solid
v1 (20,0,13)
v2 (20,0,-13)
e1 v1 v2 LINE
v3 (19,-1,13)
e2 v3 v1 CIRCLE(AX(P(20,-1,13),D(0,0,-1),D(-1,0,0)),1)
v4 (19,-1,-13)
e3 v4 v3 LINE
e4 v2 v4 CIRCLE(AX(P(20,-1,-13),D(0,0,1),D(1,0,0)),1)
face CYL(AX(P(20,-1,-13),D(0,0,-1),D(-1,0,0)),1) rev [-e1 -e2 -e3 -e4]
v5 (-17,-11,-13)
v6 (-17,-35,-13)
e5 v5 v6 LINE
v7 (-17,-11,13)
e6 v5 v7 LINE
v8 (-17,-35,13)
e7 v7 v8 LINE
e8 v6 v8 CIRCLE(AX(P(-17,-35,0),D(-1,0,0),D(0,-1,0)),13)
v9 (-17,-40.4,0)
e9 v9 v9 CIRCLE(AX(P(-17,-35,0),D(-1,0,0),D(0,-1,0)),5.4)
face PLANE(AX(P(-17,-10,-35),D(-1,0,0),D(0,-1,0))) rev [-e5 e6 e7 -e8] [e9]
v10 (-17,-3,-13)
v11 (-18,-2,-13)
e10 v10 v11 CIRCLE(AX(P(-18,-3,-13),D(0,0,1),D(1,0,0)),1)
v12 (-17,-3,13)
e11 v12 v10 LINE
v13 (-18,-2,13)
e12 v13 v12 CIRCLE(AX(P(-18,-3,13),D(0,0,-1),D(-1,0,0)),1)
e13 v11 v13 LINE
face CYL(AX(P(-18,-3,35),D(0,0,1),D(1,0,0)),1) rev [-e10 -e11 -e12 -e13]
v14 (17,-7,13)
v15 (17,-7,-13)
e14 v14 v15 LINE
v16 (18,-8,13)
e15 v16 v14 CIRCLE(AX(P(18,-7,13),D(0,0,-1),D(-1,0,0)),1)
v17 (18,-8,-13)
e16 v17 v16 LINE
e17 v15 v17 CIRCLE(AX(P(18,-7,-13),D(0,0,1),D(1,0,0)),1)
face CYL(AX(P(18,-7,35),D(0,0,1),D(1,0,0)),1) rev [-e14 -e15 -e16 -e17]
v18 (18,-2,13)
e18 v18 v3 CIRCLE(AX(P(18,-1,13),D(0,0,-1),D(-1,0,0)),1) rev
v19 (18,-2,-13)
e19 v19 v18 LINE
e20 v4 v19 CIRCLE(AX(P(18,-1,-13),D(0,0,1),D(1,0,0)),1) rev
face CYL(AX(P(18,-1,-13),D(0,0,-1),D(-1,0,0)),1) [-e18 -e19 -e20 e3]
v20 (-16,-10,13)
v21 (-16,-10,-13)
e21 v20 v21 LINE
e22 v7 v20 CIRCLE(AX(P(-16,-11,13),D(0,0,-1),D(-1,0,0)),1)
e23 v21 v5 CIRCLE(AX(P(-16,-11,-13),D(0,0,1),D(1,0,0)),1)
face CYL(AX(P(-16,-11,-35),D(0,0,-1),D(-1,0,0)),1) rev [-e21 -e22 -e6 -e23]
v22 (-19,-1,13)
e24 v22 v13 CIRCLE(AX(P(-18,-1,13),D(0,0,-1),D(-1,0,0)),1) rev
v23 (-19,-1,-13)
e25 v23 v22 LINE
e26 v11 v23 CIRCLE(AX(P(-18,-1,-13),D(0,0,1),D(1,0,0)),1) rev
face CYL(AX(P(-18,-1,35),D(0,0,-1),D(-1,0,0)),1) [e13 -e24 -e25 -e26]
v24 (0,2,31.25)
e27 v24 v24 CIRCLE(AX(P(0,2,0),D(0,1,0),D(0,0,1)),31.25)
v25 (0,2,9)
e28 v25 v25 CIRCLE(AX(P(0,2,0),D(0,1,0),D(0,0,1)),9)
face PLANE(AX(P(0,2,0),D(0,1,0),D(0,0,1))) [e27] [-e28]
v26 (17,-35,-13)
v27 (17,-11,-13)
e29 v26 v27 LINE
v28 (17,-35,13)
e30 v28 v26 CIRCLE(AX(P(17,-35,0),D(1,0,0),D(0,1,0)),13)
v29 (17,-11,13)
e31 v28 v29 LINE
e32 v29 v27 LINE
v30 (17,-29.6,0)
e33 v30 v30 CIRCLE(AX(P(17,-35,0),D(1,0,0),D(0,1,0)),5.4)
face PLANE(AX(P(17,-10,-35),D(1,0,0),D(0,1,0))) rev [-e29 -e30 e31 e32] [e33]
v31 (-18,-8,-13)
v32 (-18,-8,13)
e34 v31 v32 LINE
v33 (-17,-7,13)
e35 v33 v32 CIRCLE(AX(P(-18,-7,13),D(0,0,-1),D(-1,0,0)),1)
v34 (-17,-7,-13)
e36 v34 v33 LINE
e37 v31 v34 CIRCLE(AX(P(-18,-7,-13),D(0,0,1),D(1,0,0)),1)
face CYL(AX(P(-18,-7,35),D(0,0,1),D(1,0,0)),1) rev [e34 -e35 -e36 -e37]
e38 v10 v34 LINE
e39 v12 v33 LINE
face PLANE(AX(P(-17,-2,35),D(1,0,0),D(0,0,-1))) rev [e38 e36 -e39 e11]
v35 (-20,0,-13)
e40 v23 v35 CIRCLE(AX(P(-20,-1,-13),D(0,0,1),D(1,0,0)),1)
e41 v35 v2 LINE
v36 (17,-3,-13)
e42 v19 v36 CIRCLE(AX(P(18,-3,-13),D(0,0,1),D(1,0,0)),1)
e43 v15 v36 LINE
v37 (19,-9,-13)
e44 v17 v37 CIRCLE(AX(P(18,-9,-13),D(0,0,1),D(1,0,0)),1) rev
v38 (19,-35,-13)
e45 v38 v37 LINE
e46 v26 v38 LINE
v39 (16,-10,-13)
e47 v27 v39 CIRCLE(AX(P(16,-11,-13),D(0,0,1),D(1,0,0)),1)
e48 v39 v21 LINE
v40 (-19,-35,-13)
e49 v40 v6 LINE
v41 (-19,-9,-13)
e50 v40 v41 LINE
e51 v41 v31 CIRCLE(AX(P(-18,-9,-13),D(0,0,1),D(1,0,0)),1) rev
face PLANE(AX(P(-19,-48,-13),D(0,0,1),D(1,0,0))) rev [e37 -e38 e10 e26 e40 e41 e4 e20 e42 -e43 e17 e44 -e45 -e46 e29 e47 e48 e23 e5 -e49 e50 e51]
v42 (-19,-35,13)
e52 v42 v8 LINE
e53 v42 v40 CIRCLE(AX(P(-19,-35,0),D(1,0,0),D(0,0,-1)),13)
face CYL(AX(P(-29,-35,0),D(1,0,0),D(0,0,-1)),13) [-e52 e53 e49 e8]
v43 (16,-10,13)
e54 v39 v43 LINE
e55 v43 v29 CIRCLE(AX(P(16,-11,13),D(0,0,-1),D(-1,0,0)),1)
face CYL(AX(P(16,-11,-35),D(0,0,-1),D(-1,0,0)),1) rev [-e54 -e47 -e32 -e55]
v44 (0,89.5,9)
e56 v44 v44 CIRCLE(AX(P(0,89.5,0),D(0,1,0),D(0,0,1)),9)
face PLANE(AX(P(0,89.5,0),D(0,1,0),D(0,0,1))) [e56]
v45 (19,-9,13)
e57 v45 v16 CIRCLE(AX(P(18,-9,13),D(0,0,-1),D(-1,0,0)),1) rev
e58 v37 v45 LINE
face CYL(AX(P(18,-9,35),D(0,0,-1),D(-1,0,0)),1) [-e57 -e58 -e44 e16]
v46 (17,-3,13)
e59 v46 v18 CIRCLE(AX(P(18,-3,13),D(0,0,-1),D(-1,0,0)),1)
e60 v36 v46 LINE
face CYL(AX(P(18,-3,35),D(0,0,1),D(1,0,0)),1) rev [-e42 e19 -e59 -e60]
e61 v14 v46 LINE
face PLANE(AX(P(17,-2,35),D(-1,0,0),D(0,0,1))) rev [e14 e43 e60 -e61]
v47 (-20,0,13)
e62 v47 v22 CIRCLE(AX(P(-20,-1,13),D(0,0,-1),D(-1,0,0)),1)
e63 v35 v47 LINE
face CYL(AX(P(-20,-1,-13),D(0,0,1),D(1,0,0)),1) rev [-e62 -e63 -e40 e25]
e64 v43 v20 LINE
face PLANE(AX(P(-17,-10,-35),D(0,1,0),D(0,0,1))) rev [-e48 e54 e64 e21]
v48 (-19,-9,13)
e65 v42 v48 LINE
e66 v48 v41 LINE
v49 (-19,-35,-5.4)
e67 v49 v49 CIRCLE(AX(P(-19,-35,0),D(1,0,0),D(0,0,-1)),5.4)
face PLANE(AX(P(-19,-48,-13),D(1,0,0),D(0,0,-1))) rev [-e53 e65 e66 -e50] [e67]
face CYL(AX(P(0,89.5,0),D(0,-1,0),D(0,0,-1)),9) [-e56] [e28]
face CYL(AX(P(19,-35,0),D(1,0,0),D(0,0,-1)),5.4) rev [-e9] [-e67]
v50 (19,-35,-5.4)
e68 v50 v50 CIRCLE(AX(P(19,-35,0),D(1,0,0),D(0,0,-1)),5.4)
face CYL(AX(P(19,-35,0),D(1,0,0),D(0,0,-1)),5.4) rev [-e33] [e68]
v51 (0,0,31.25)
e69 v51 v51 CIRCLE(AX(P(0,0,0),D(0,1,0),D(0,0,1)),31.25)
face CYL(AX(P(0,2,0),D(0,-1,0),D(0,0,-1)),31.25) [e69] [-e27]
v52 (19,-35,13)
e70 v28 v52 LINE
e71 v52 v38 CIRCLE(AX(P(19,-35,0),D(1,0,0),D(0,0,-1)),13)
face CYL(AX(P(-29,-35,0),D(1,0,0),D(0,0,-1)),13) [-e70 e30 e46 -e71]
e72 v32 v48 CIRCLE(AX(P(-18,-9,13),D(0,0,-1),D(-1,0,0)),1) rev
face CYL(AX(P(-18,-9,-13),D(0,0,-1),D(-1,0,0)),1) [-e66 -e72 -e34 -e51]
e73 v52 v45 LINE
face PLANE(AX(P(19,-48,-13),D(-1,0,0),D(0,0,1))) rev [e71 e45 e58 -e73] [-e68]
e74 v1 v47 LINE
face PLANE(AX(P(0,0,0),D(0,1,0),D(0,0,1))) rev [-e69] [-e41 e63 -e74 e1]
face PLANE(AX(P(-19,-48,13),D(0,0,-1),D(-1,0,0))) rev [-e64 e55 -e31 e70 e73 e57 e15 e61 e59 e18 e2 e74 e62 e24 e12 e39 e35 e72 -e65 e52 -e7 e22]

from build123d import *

# Parameters (mm, degrees)
SKETCH1_R               = 31.25
BOSS_EXTRUDE1_DEPTH     = 2
SKETCH2_W               = 38
SKETCH2_H               = 26
BOSS_EXTRUDE2_DEPTH     = 48
SKETCH3_W               = 34
SKETCH3_H               = 38
CUT_EXTRUDE1_DEPTH      = 48
CUT_EXTRUDE2_DEPTH      = 48
M12X1_25_TAPPED_HOLE1_D = 10.8
SKETCH7_W               = 2
SKETCH7_H               = 6
CUT_EXTRUDE3_DEPTH      = 48
FILLET2_R               = 1
SKETCH8_R               = 9
BOSS_EXTRUDE3_DEPTH     = 87.5


with BuildPart() as part:
    # Sketch1 → Boss-Extrude1 (new body)
    with BuildSketch(Plane(origin=(0, 0, 0), x_dir=(1, 0, 0), z_dir=(0, 1, 0))):
        with Locations(Location((0, 0, 0), (0, 0, 270))):
            Circle(SKETCH1_R)
    extrude(amount=BOSS_EXTRUDE1_DEPTH)

    # Sketch2 → Boss-Extrude2 (add)
    with BuildSketch(Plane.XZ):
        Rectangle(SKETCH2_W, SKETCH2_H)
    extrude(amount=BOSS_EXTRUDE2_DEPTH)

    # Sketch3 → Cut-Extrude1 (cut)
    with BuildSketch(Plane.XY.offset(13)):
        with Locations((0, -29)):
            Rectangle(SKETCH3_W, SKETCH3_H)
    extrude(amount=-CUT_EXTRUDE1_DEPTH, mode=Mode.SUBTRACT)

    # Sketch4 → Cut-Extrude2 (cut)
    with BuildSketch(Plane(origin=(19, 0, 0), x_dir=(0, 0, -1), z_dir=(1, 0, 0))):
        with BuildLine():
            ThreePointArc((0, -48), (-9.192388155, -44.192388155), (-13, -35))
            Line((-13, -35), (-13, -48))
            Line((-13, -48), (0, -48))
        make_face()
        with BuildLine():
            Line((13, -48), (13, -35))
            ThreePointArc((13, -35), (9.192388155, -44.192388155), (0, -48))
            Line((0, -48), (13, -48))
        make_face()
    extrude(amount=-CUT_EXTRUDE2_DEPTH, mode=Mode.SUBTRACT)

    # M12x1.25 Tapped Hole1 (through all)
    with Locations(Plane(origin=(19, 0, 0), x_dir=(0, 0, -1), z_dir=(1, 0, 0))):
        with Locations((0, -35)):
            Hole(M12X1_25_TAPPED_HOLE1_D / 2)

    # Sketch7 → Cut-Extrude3 (cut)
    with BuildSketch(Plane(origin=(0, 0, -13), x_dir=(-1, 0, 0), z_dir=(0, 0, -1))):
        with Locations((-18, -5)):
            Rectangle(SKETCH7_W, SKETCH7_H)
        with Locations((18, -5)):
            Rectangle(SKETCH7_W, SKETCH7_H)
    extrude(amount=-CUT_EXTRUDE3_DEPTH, mode=Mode.SUBTRACT)

    # Fillet2
    fillet2_edges = [part.edges().sort_by_distance(p)[0] for p in [
        (17, -10, 0),
        (-17, -10, 0),
        (19, -8, 0),
        (17, -8, 0),
        (17, -2, 0),
        (19, -2, 0),
        (19, 0, 0),
        (-19, 0, 0),
        (-19, -2, 0),
        (-17, -2, 0),
        (-17, -8, 0),
        (-19, -8, 0),
    ]]
    fillet(fillet2_edges, radius=FILLET2_R - 0.0001)  # a hair under: the kernel refuses the full size

    # Sketch8 → Boss-Extrude3 (add)
    with BuildSketch(Plane(origin=(0, 2, 0), x_dir=(1, 0, 0), z_dir=(0, 1, 0))):
        with Locations(Location((0, 0, 0), (0, 0, 270))):
            Circle(SKETCH8_R)
    extrude(amount=BOSS_EXTRUDE3_DEPTH)


solid = part.part
